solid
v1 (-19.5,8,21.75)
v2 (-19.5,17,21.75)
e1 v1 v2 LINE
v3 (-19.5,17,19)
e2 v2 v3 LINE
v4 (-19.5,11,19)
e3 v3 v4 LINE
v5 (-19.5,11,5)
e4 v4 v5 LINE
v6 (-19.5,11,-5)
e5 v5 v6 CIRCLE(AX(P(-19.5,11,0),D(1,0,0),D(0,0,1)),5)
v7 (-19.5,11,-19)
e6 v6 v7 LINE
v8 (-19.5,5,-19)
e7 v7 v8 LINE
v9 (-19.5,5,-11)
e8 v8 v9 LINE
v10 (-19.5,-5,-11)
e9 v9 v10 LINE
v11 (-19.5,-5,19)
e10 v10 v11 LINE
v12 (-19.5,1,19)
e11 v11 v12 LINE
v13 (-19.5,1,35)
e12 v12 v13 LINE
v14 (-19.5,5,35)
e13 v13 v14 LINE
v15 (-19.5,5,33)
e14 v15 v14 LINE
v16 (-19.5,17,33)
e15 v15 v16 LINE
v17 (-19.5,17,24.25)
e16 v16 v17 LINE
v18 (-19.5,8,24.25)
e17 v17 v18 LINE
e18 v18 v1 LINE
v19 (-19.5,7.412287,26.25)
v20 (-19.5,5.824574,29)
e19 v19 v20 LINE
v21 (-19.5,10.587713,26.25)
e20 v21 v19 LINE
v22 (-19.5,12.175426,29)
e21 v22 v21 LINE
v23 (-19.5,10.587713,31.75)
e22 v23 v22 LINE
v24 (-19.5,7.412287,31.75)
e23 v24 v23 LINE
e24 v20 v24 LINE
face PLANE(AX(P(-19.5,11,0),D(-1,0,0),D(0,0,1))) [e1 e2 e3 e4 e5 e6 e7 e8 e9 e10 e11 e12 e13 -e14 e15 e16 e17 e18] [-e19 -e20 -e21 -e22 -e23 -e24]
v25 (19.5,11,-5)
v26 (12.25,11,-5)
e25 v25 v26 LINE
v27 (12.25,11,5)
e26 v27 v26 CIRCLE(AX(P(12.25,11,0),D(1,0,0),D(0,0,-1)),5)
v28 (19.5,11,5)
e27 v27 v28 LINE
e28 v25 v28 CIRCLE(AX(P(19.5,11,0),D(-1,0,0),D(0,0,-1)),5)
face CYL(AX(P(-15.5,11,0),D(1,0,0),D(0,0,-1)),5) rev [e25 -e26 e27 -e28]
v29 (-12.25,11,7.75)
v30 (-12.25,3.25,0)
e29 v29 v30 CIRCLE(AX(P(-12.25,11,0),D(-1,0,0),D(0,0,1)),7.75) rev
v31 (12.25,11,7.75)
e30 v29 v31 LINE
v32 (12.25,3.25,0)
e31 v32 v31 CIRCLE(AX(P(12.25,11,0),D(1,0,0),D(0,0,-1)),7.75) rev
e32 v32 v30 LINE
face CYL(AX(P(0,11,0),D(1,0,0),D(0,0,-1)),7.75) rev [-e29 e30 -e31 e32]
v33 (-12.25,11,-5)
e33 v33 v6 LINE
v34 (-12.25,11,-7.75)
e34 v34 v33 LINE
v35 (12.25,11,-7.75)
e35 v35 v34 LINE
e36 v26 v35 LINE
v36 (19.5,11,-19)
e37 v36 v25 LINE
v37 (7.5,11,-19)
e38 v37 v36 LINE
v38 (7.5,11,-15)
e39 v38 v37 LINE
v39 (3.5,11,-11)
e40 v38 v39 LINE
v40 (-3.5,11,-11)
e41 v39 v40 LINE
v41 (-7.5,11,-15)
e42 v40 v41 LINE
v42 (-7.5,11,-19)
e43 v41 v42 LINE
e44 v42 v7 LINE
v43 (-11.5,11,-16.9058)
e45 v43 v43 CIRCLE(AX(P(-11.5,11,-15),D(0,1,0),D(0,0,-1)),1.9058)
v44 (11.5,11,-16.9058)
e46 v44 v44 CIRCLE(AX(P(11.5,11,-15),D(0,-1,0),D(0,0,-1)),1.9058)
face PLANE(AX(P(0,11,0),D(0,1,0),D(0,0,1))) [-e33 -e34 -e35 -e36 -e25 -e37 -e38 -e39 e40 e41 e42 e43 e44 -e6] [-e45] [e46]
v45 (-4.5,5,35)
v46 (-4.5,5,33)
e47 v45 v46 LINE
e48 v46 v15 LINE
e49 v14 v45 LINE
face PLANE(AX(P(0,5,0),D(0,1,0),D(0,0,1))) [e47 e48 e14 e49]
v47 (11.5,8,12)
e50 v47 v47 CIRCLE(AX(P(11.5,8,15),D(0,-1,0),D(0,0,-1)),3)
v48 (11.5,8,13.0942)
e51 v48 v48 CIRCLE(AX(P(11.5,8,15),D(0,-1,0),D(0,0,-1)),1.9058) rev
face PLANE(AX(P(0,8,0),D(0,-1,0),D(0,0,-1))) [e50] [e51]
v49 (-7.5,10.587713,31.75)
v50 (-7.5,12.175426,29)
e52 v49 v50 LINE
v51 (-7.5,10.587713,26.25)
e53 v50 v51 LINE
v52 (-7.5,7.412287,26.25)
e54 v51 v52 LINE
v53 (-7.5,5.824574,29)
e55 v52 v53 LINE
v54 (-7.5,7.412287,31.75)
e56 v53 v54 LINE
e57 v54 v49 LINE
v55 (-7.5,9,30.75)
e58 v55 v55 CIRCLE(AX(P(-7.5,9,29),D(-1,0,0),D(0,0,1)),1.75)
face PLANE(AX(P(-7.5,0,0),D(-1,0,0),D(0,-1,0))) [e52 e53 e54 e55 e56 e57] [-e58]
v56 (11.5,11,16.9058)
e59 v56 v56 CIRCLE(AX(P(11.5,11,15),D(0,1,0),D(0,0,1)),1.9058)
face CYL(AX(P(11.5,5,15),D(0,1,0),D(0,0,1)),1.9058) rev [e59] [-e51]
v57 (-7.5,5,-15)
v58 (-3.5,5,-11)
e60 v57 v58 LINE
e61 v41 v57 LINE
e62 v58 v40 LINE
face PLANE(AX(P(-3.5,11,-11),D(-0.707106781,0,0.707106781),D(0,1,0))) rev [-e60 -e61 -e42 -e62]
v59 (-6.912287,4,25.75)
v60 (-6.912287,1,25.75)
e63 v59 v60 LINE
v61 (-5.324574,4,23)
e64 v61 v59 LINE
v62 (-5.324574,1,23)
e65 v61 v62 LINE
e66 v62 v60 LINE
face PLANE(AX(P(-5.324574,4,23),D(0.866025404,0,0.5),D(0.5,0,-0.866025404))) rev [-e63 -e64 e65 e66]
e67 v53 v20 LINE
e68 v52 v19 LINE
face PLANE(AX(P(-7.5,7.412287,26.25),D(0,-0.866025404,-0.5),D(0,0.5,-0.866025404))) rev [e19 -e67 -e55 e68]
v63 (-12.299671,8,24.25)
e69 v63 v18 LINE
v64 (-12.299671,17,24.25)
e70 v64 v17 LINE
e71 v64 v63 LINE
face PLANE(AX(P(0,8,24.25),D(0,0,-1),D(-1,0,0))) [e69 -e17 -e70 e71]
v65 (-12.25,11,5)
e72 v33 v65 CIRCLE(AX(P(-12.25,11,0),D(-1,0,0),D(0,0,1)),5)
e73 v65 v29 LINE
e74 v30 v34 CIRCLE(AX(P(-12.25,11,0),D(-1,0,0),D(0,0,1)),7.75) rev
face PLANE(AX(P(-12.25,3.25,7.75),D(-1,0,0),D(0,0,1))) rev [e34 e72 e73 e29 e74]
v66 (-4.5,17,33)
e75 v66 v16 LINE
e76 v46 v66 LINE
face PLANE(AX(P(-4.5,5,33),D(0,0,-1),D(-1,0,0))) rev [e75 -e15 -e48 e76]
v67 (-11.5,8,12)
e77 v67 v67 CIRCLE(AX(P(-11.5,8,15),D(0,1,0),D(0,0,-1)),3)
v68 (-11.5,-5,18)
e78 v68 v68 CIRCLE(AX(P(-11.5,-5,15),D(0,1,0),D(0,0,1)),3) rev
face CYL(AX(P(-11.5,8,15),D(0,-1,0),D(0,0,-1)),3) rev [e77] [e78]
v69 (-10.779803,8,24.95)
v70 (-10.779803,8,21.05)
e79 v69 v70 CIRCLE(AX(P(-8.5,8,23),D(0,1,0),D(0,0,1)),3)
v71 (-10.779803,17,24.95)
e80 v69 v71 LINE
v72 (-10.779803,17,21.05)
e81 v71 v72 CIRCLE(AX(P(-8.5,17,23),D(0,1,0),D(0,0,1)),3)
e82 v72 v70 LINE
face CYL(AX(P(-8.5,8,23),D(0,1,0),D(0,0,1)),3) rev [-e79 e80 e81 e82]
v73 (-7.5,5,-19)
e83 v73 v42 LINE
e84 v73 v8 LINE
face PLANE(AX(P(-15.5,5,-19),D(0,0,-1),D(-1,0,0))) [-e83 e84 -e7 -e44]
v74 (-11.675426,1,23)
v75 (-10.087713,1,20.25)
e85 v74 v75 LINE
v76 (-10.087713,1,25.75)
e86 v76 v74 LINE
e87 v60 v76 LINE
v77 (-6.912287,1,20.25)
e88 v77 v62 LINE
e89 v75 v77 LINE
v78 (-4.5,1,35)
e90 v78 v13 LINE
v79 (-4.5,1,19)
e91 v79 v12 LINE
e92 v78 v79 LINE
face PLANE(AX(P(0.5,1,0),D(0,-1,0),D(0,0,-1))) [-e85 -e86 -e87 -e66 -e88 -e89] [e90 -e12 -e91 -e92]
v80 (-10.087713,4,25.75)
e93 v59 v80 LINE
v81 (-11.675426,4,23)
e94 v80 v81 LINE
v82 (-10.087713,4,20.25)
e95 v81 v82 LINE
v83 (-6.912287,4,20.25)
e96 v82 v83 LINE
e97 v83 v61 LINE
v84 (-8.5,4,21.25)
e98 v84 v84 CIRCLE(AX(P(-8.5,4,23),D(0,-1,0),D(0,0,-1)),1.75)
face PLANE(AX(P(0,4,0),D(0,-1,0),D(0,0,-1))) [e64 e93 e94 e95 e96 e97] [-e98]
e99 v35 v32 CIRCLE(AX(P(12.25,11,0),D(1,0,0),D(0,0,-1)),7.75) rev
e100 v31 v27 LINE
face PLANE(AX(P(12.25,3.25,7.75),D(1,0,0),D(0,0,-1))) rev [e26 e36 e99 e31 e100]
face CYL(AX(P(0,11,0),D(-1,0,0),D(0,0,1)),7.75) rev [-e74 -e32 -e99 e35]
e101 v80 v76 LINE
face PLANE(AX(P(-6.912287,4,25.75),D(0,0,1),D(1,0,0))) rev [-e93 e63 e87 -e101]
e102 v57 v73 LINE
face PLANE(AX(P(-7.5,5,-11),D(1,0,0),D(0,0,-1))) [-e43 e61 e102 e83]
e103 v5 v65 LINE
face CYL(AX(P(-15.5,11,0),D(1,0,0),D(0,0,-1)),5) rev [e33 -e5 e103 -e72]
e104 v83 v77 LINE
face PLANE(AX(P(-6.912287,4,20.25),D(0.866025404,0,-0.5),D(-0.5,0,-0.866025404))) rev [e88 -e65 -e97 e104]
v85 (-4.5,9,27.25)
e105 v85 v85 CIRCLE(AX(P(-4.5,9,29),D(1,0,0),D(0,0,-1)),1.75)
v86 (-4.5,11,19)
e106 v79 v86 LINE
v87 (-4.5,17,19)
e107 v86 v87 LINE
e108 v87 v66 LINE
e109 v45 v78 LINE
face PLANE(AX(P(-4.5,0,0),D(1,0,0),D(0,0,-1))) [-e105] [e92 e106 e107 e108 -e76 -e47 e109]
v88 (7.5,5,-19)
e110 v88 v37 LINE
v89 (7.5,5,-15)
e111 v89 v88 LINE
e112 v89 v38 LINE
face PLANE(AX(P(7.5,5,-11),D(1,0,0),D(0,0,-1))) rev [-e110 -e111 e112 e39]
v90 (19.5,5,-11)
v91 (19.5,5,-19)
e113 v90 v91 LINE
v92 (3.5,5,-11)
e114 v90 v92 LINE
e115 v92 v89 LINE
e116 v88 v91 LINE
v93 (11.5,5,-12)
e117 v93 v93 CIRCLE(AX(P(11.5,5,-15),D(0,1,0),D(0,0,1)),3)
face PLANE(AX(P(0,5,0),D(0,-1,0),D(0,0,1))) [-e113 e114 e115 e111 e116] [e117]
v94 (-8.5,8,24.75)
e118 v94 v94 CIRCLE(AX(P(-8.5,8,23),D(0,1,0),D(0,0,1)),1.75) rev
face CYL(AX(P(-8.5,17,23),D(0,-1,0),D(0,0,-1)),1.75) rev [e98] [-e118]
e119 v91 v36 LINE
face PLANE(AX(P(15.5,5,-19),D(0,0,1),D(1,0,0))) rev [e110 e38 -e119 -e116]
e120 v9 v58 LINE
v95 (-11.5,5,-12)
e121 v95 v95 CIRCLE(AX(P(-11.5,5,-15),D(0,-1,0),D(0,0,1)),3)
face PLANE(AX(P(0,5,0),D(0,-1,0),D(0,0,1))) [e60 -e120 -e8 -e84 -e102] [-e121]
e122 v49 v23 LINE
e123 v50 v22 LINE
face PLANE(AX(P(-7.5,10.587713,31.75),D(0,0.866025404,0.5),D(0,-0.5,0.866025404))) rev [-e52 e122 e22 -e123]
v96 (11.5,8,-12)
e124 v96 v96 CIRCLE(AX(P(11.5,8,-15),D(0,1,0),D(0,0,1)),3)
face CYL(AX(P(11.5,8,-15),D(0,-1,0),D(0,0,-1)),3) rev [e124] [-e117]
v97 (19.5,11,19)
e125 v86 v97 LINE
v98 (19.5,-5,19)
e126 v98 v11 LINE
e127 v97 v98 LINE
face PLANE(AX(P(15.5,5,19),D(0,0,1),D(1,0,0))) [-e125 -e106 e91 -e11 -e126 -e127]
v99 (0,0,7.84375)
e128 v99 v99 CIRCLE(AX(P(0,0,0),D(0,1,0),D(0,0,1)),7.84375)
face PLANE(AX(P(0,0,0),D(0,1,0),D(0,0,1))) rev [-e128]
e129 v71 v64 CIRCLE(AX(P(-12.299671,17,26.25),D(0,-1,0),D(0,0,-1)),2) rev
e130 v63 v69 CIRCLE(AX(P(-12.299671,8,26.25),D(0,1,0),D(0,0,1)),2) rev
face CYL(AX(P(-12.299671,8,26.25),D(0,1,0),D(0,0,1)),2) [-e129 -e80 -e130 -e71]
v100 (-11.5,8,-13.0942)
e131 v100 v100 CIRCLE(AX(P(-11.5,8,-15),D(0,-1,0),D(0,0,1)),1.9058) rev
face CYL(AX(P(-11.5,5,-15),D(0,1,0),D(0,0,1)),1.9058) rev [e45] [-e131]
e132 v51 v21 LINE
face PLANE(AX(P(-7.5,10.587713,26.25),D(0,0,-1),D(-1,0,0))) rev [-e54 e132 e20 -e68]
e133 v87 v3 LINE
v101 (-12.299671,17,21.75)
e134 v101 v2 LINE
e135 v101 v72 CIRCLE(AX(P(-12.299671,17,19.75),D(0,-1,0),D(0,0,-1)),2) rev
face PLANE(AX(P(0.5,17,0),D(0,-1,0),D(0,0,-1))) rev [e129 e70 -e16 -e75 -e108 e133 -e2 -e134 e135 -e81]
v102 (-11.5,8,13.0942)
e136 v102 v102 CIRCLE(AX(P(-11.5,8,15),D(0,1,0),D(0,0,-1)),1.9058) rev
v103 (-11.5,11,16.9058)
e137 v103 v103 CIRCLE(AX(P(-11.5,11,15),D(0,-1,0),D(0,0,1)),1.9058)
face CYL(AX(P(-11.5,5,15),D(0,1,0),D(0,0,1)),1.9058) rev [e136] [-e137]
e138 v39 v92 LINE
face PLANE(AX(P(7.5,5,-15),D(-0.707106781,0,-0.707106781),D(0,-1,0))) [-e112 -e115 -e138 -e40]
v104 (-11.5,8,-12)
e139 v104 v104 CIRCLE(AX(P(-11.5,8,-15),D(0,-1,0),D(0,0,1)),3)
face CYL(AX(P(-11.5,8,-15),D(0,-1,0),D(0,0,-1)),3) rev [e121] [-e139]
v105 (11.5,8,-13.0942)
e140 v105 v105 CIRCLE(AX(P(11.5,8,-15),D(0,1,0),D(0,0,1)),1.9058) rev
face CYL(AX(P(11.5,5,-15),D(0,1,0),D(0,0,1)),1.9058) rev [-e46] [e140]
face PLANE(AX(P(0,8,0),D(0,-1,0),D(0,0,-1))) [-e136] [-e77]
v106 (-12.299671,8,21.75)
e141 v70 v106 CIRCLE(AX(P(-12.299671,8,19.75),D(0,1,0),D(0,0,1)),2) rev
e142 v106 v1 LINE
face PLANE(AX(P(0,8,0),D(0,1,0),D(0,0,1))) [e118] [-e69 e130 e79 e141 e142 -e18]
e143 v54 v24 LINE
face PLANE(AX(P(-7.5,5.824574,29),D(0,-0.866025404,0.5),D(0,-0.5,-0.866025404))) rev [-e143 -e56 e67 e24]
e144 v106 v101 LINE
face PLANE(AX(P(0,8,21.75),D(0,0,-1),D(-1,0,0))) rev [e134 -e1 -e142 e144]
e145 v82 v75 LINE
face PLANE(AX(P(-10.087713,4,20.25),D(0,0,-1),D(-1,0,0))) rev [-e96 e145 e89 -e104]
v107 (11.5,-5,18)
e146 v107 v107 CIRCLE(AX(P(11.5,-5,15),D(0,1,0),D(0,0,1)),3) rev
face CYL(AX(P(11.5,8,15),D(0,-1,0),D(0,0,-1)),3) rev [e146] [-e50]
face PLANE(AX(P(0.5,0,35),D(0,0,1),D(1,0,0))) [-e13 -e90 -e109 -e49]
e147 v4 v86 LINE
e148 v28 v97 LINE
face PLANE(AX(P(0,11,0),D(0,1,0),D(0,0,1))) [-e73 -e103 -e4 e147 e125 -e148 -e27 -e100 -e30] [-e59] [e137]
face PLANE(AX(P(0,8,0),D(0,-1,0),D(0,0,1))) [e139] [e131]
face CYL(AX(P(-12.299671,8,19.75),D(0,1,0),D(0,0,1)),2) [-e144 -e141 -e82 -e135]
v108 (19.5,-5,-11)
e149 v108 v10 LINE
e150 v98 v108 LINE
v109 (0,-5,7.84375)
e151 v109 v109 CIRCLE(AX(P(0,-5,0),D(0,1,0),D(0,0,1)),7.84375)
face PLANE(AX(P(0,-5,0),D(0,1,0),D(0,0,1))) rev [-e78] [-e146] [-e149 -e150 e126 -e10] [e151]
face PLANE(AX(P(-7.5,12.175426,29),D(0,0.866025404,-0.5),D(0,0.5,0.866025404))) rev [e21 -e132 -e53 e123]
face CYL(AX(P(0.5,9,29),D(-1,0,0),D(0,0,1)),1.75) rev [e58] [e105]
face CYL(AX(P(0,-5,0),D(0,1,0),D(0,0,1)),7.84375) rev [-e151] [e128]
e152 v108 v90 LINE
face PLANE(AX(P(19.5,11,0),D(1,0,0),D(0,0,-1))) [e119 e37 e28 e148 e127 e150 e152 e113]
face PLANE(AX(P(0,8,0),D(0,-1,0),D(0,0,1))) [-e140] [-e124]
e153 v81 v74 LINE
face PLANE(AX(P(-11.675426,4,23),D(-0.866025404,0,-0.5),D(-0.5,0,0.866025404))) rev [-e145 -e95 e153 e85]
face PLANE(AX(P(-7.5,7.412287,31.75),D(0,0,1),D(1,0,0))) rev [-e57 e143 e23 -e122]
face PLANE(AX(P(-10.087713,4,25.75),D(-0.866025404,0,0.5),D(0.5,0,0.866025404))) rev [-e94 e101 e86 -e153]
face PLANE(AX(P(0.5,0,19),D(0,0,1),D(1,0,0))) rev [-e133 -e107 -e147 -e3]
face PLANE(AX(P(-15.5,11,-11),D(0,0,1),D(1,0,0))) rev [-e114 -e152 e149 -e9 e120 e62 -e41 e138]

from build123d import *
from build123d.topology import SkipClean

# Parameters (mm, degrees)
SKETCH1_W                 = 31
SKETCH1_H                 = 22
BOSS_EXTRUDE1_DEPTH       = 11
SKETCH2_W                 = 31
SKETCH2_H                 = 22
SKETCH2_R                 = 7.843750423
BOSS_EXTRUDE2_DEPTH       = 5
SKETCH3_W                 = 24.5
SKETCH3_H                 = 15.5
CUT_EXTRUDE1_DEPTH        = 7.75
FILLET1_R                 = 7.75
CUT_EXTRUDE2_DEPTH        = 32.812929761
CUT_EXTRUDE2_DEPTH_BACK   = 32.812929761
SKETCH4_R                 = 5
SKETCH5_W                 = 8
SKETCH5_H                 = 8
SKETCH5_R                 = 1.905800151
BOSS_EXTRUDE3_DEPTH       = 6
CUT_EXTRUDE3_START        = -3
SKETCH6_R                 = 3
SKETCH6_R_2               = 1.905800151
CUT_EXTRUDE3_DEPTH        = 3
MIRROR9_COPY_1_SKETCH_W   = 8
MIRROR9_COPY_1_SKETCH_H   = 8
MIRROR9_COPY_1_SKETCH_R   = 1.905800151
MIRROR9_COPY_1_DEPTH      = 6
MIRROR9_START             = -3
MIRROR9_COPY_2_SKETCH_R   = 3
MIRROR9_COPY_2_SKETCH_R_2 = 1.905800151
MIRROR9_COPY_2_DEPTH      = 3
CHAMFER2_SIZE             = 4
SKETCH8_R                 = 3
BOSS_EXTRUDE4_DEPTH       = 16
SKETCH9_R                 = 1.75
BOSS_EXTRUDE5_DEPTH       = 16
CUT_EXTRUDE6_DEPTH        = 9
SKETCH11_R                = 1.75
CUT_EXTRUDE7_DEPTH        = 8
FILLET2_R                 = 2
CUT_EXTRUDE8_DEPTH        = 41.425858061
CUT_EXTRUDE8_DEPTH_BACK   = 41.425858061
SKETCH12_R                = 1.75
CUT_EXTRUDE9_START        = -3
SKETCH13_R                = 1.75
CUT_EXTRUDE9_DEPTH        = 3
BOSS_EXTRUDE8_DEPTH       = 4
BOSS_EXTRUDE9_DEPTH       = 4
CUT_EXTRUDE11_START       = -5
SKETCH18_R                = 1.75
CUT_EXTRUDE11_DEPTH       = 5
SKETCH20_W                = 15
SKETCH20_H                = 2
CUT_EXTRUDE12_DEPTH       = 12


with BuildPart() as part:
    # Sketch1 → Boss-Extrude1 (new body)
    with BuildSketch(Plane(origin=(0, 0, 0), x_dir=(1, 0, 0), z_dir=(0, 1, 0))):
        Rectangle(SKETCH1_W, SKETCH1_H)
    extrude(amount=BOSS_EXTRUDE1_DEPTH)

    # Sketch2 → Boss-Extrude2 (add)
    with BuildSketch(Plane(origin=(0, 0, 0), x_dir=(1, 0, 0), z_dir=(0, 1, 0))):
        Rectangle(SKETCH2_W, SKETCH2_H)
        with Locations(Location((0, 0, 0), (0, 0, 270))):
            Circle(SKETCH2_R, mode=Mode.SUBTRACT)
    extrude(amount=-BOSS_EXTRUDE2_DEPTH)

    # Sketch3 → Cut-Extrude1 (cut)
    with BuildSketch(Plane(origin=(0, 11, 0), x_dir=(1, 0, 0), z_dir=(0, 1, 0))):
        Rectangle(SKETCH3_W, SKETCH3_H)
    extrude(amount=-CUT_EXTRUDE1_DEPTH, mode=Mode.SUBTRACT)

    # Fillet1
    fillet1_edges = [part.edges().sort_by_distance(p)[0] for p in [
        (0, 3.25, 7.75),
        (0, 3.25, -7.75),
    ]]
    fillet(fillet1_edges, radius=FILLET1_R - 0.0001)  # a hair under: the kernel refuses the full size

    # Sketch4 → Cut-Extrude2 (cut, two sides: drawn at the far end of the back side and taken through both)
    with BuildSketch(Plane(origin=(-12.25, 0, 0), x_dir=(0, 0, -1), z_dir=(1, 0, 0)).offset(-CUT_EXTRUDE2_DEPTH_BACK)):
        with Locations((0, 11)):
            Circle(SKETCH4_R)
    extrude(amount=CUT_EXTRUDE2_DEPTH + CUT_EXTRUDE2_DEPTH_BACK, mode=Mode.SUBTRACT)

    # Sketch5 → Boss-Extrude3 (add)
    with BuildSketch(Plane(origin=(0, 11, 0), x_dir=(1, 0, 0), z_dir=(0, 1, 0))):
        with Locations((11.5, -15)):
            Rectangle(SKETCH5_W, SKETCH5_H)
        with Locations(Location((11.5, -15, 0), (0, 0, 270))):
            Circle(SKETCH5_R, mode=Mode.SUBTRACT)
    boss_extrude3 = extrude(amount=-BOSS_EXTRUDE3_DEPTH)

    # Sketch6 → Cut-Extrude3 (cut)
    with BuildSketch(Plane.XZ.offset(-5).offset(CUT_EXTRUDE3_START)):
        with Locations(Location((11.5, 15, 0), (0, 0, 270))):
            Circle(SKETCH6_R)
        with Locations(Location((11.5, 15, 0), (0, 0, 90))):
            Circle(SKETCH6_R_2, mode=Mode.SUBTRACT)
    cut_extrude3 = extrude(amount=CUT_EXTRUDE3_DEPTH, mode=Mode.SUBTRACT)

    # Mirror8: Boss-Extrude3, Cut-Extrude3 across plane
    add(boss_extrude3.mirror(Plane(origin=(0, 0, 0), x_dir=(0, 0, 1), z_dir=(1, 0, 0))))
    add(cut_extrude3.mirror(Plane(origin=(0, 0, 0), x_dir=(0, 0, 1), z_dir=(1, 0, 0))), mode=Mode.SUBTRACT)

    # Mirror9: Boss-Extrude3, Cut-Extrude3 across plane
    add(boss_extrude3.mirror(Plane.XY))
    add(cut_extrude3.mirror(Plane.XY), mode=Mode.SUBTRACT)

    # Mirror9 copy 1 sketch → Mirror9 copy 1 (add)
    with BuildSketch(Plane(origin=(0, 11, 0), x_dir=(-1, 0, 0), z_dir=(0, 1, 0))):
        with Locations((11.5, -15)):
            Rectangle(MIRROR9_COPY_1_SKETCH_W, MIRROR9_COPY_1_SKETCH_H)
        with Locations(Location((11.5, -15, 0), (0, 0, 270))):
            Circle(MIRROR9_COPY_1_SKETCH_R, mode=Mode.SUBTRACT)
    extrude(amount=-MIRROR9_COPY_1_DEPTH)

    # Mirror9 copy 2 sketch → Mirror9 copy 2 (cut)
    with BuildSketch(Plane(origin=(0, 5, 0), x_dir=(-1, 0, 0), z_dir=(0, -1, 0)).offset(MIRROR9_START)):
        with Locations(Location((11.5, 15, 0), (0, 0, 270))):
            Circle(MIRROR9_COPY_2_SKETCH_R)
        with Locations(Location((11.5, 15, 0), (0, 0, 90))):
            Circle(MIRROR9_COPY_2_SKETCH_R_2, mode=Mode.SUBTRACT)
    extrude(amount=MIRROR9_COPY_2_DEPTH, mode=Mode.SUBTRACT)

    # Chamfer2
    chamfer2_edges = [part.edges().sort_by_distance(p)[0] for p in [
        (-7.5, 8, -11),
        (7.5, 8, -11),
        (7.5, 8, 11),
        (-7.5, 8, 11),
    ]]
    chamfer(chamfer2_edges, length=CHAMFER2_SIZE)

    # Sketch8 → Boss-Extrude4 (add)
    # profile 1 of 3: a face of its own
    with BuildSketch(Plane(origin=(0, 11, 0), x_dir=(1, 0, 0), z_dir=(0, 1, 0))):
        Polygon((3.5, -11), (-3.5, -11), (-7.5, -15), (-7.5, -19), (7.5, -19), (7.5, -15), align=None)
    # profile 2 of 3: a face of its own
    with BuildSketch(Plane(origin=(0, 11, 0), x_dir=(1, 0, 0), z_dir=(0, 1, 0))):
        Polygon((15.5, -11), (3.5, -11), (7.5, -15), (7.5, -19), (15.5, -19), align=None)
        with Locations(Location((11.5, -15, 0), (0, 0, 90))):
            Circle(SKETCH8_R, mode=Mode.SUBTRACT)
    # profile 3 of 3: a face of its own
    with BuildSketch(Plane(origin=(0, 11, 0), x_dir=(1, 0, 0), z_dir=(0, 1, 0))):
        Polygon((-3.5, -11), (-15.5, -11), (-15.5, -19), (-7.5, -19), (-7.5, -15), align=None)
        with Locations(Location((-11.5, -15, 0), (0, 0, 90))):
            Circle(SKETCH8_R, mode=Mode.SUBTRACT)
    extrude(amount=-BOSS_EXTRUDE4_DEPTH)

    # Sketch9 → Boss-Extrude5 (add)
    with BuildSketch(Plane.ZY.offset(15.5)):
        Polygon((19, 11), (19, 1), (35, 1), (35, 17), (19, 17), align=None)
        with Locations((29, 9)):
            Circle(SKETCH9_R, mode=Mode.SUBTRACT)
    extrude(amount=-BOSS_EXTRUDE5_DEPTH)

    # Sketch10 → Cut-Extrude6 (cut)
    with BuildSketch(Plane(origin=(0, 17, 0), x_dir=(1, 0, 0), z_dir=(0, 1, 0))):
        with BuildLine():
            ThreePointArc((-11.227178029, -24.25), (-11.5, -23), (-11.227178029, -21.75))
            Line((-11.227178029, -21.75), (-15.5, -21.75))
            Line((-15.5, -21.75), (-15.5, -24.25))
            Line((-15.5, -24.25), (-11.227178029, -24.25))
        make_face()
        with BuildLine():
            Line((-8.5, -24.25), (-8.5, -21.75))
            Line((-8.5, -21.75), (-11.227178029, -21.75))
            ThreePointArc((-11.227178029, -21.75), (-11.5, -23), (-11.227178029, -24.25))
            Line((-11.227178029, -24.25), (-8.5, -24.25))
        make_face()
        with BuildLine():
            Line((-11.227178029, -21.75), (-8.5, -21.75))
            Line((-8.5, -21.75), (-8.5, -24.25))
            Line((-8.5, -24.25), (-11.227178029, -24.25))
            ThreePointArc((-11.227178029, -24.25), (-7.860286817, -25.931001031), (-5.5, -23))
            ThreePointArc((-5.5, -23), (-7.860286817, -20.068998969), (-11.227178029, -21.75))
        make_face()
    extrude(amount=-CUT_EXTRUDE6_DEPTH, mode=Mode.SUBTRACT)

    # Sketch11 → Cut-Extrude7 (cut)
    with BuildSketch(Plane.ZY.offset(15.5)):
        Polygon((29, 12.175426481), (26.25, 10.58771324), (26.25, 7.41228676), (29, 5.824573519), (31.75, 7.41228676), (31.75, 10.58771324), align=None)
        with Locations((29, 9)):
            Circle(SKETCH11_R, mode=Mode.SUBTRACT)
    extrude(amount=-CUT_EXTRUDE7_DEPTH, mode=Mode.SUBTRACT)

    # Fillet2
    fillet2_edges = [part.edges().sort_by_distance(p)[0] for p in [
        (-11.227178029, 12.5, 21.75),
        (-11.227178029, 12.5, 24.25),
    ]]
    fillet(fillet2_edges, radius=FILLET2_R)

    # Sketch12 → Cut-Extrude8 (cut, two sides: drawn at the far end of the back side and taken through both)
    with BuildSketch(Plane(origin=(0, 8, 0), x_dir=(1, 0, 0), z_dir=(0, 1, 0)).offset(-CUT_EXTRUDE8_DEPTH_BACK)):
        with Locations(Location((-8.5, -23, 0), (0, 0, 90))):
            Circle(SKETCH12_R)
    extrude(amount=CUT_EXTRUDE8_DEPTH + CUT_EXTRUDE8_DEPTH_BACK, mode=Mode.SUBTRACT)

    # Sketch13 → Cut-Extrude9 (cut)
    with BuildSketch(Plane.XZ.offset(-1).offset(CUT_EXTRUDE9_START)):
        Polygon((-5.324573519, 23), (-6.91228676, 25.75), (-10.08771324, 25.75), (-11.675426481, 23), (-10.08771324, 20.25), (-6.91228676, 20.25), align=None)
        with Locations(Location((-8.5, 23, 0), (0, 0, 270))):
            Circle(SKETCH13_R, mode=Mode.SUBTRACT)
    extrude(amount=CUT_EXTRUDE9_DEPTH, mode=Mode.SUBTRACT)

    # Sketch15 → Boss-Extrude8 (add)
    with SkipClean():  # the faces are left unmerged after this step: merging them gives an invalid solid
        with BuildSketch(Plane.ZY.offset(15.5)):
            with BuildLine():
                Line((24.25, 17), (24.25, 8))
                Line((24.25, 8), (21.75, 8))
                Line((21.75, 8), (21.75, 17))
                Line((21.75, 17), (19, 17))
                Line((19, 17), (19, 11))
                Line((19, 11), (5, 11))
                ThreePointArc((5, 11), (0, 6), (-5, 11))
                Line((-5, 11), (-19, 11))
                Line((-19, 11), (-19, 5))
                Line((-19, 5), (-11, 5))
                Line((-11, 5), (-11, -5))
                Line((-11, -5), (19, -5))
                Line((19, -5), (19, 1))
                Line((19, 1), (35, 1))
                Line((35, 1), (35, 17))
                Line((35, 17), (24.25, 17))
            make_face()
            Polygon((29, 12.175426481), (26.25, 10.58771324), (26.25, 7.41228676), (29, 5.824573519), (31.75, 7.41228676), (31.75, 10.58771324), align=None, mode=Mode.SUBTRACT)
        extrude(amount=BOSS_EXTRUDE8_DEPTH)
    add(part.part.scale(1), mode=Mode.REPLACE)  # the faces are merged on a copy

    # Sketch17 → Boss-Extrude9 (add)
    with BuildSketch(Plane(origin=(15.5, 0, 0), x_dir=(0, 0, -1), z_dir=(1, 0, 0))):
        with BuildLine():
            Line((-5, 11), (-19, 11))
            Line((-19, 11), (-19, -5))
            Line((-19, -5), (11, -5))
            Line((11, -5), (11, 5))
            Line((11, 5), (19, 5))
            Line((19, 5), (19, 11))
            Line((19, 11), (5, 11))
            ThreePointArc((5, 11), (0, 6), (-5, 11))
        make_face()
    extrude(amount=BOSS_EXTRUDE9_DEPTH)

    # Sketch18 → Cut-Extrude11 (cut)
    with BuildSketch(Plane(origin=(0.5, 0, 0), x_dir=(0, 0, -1), z_dir=(1, 0, 0)).offset(CUT_EXTRUDE11_START)):
        Polygon((-35, 1), (-19, 1), (-19, 11), (-19, 17), (-35, 17), align=None)
        with Locations(Location((-29, 9, 0), (0, 0, 180))):
            Circle(SKETCH18_R, mode=Mode.SUBTRACT)
    extrude(amount=CUT_EXTRUDE11_DEPTH, mode=Mode.SUBTRACT)

    # Sketch20 → Cut-Extrude12 (cut)
    with BuildSketch(Plane(origin=(0, 17, 0), x_dir=(1, 0, 0), z_dir=(0, 1, 0))):
        with Locations((-12, -34)):
            Rectangle(SKETCH20_W, SKETCH20_H)
    extrude(amount=-CUT_EXTRUDE12_DEPTH, mode=Mode.SUBTRACT)


solid = part.part
